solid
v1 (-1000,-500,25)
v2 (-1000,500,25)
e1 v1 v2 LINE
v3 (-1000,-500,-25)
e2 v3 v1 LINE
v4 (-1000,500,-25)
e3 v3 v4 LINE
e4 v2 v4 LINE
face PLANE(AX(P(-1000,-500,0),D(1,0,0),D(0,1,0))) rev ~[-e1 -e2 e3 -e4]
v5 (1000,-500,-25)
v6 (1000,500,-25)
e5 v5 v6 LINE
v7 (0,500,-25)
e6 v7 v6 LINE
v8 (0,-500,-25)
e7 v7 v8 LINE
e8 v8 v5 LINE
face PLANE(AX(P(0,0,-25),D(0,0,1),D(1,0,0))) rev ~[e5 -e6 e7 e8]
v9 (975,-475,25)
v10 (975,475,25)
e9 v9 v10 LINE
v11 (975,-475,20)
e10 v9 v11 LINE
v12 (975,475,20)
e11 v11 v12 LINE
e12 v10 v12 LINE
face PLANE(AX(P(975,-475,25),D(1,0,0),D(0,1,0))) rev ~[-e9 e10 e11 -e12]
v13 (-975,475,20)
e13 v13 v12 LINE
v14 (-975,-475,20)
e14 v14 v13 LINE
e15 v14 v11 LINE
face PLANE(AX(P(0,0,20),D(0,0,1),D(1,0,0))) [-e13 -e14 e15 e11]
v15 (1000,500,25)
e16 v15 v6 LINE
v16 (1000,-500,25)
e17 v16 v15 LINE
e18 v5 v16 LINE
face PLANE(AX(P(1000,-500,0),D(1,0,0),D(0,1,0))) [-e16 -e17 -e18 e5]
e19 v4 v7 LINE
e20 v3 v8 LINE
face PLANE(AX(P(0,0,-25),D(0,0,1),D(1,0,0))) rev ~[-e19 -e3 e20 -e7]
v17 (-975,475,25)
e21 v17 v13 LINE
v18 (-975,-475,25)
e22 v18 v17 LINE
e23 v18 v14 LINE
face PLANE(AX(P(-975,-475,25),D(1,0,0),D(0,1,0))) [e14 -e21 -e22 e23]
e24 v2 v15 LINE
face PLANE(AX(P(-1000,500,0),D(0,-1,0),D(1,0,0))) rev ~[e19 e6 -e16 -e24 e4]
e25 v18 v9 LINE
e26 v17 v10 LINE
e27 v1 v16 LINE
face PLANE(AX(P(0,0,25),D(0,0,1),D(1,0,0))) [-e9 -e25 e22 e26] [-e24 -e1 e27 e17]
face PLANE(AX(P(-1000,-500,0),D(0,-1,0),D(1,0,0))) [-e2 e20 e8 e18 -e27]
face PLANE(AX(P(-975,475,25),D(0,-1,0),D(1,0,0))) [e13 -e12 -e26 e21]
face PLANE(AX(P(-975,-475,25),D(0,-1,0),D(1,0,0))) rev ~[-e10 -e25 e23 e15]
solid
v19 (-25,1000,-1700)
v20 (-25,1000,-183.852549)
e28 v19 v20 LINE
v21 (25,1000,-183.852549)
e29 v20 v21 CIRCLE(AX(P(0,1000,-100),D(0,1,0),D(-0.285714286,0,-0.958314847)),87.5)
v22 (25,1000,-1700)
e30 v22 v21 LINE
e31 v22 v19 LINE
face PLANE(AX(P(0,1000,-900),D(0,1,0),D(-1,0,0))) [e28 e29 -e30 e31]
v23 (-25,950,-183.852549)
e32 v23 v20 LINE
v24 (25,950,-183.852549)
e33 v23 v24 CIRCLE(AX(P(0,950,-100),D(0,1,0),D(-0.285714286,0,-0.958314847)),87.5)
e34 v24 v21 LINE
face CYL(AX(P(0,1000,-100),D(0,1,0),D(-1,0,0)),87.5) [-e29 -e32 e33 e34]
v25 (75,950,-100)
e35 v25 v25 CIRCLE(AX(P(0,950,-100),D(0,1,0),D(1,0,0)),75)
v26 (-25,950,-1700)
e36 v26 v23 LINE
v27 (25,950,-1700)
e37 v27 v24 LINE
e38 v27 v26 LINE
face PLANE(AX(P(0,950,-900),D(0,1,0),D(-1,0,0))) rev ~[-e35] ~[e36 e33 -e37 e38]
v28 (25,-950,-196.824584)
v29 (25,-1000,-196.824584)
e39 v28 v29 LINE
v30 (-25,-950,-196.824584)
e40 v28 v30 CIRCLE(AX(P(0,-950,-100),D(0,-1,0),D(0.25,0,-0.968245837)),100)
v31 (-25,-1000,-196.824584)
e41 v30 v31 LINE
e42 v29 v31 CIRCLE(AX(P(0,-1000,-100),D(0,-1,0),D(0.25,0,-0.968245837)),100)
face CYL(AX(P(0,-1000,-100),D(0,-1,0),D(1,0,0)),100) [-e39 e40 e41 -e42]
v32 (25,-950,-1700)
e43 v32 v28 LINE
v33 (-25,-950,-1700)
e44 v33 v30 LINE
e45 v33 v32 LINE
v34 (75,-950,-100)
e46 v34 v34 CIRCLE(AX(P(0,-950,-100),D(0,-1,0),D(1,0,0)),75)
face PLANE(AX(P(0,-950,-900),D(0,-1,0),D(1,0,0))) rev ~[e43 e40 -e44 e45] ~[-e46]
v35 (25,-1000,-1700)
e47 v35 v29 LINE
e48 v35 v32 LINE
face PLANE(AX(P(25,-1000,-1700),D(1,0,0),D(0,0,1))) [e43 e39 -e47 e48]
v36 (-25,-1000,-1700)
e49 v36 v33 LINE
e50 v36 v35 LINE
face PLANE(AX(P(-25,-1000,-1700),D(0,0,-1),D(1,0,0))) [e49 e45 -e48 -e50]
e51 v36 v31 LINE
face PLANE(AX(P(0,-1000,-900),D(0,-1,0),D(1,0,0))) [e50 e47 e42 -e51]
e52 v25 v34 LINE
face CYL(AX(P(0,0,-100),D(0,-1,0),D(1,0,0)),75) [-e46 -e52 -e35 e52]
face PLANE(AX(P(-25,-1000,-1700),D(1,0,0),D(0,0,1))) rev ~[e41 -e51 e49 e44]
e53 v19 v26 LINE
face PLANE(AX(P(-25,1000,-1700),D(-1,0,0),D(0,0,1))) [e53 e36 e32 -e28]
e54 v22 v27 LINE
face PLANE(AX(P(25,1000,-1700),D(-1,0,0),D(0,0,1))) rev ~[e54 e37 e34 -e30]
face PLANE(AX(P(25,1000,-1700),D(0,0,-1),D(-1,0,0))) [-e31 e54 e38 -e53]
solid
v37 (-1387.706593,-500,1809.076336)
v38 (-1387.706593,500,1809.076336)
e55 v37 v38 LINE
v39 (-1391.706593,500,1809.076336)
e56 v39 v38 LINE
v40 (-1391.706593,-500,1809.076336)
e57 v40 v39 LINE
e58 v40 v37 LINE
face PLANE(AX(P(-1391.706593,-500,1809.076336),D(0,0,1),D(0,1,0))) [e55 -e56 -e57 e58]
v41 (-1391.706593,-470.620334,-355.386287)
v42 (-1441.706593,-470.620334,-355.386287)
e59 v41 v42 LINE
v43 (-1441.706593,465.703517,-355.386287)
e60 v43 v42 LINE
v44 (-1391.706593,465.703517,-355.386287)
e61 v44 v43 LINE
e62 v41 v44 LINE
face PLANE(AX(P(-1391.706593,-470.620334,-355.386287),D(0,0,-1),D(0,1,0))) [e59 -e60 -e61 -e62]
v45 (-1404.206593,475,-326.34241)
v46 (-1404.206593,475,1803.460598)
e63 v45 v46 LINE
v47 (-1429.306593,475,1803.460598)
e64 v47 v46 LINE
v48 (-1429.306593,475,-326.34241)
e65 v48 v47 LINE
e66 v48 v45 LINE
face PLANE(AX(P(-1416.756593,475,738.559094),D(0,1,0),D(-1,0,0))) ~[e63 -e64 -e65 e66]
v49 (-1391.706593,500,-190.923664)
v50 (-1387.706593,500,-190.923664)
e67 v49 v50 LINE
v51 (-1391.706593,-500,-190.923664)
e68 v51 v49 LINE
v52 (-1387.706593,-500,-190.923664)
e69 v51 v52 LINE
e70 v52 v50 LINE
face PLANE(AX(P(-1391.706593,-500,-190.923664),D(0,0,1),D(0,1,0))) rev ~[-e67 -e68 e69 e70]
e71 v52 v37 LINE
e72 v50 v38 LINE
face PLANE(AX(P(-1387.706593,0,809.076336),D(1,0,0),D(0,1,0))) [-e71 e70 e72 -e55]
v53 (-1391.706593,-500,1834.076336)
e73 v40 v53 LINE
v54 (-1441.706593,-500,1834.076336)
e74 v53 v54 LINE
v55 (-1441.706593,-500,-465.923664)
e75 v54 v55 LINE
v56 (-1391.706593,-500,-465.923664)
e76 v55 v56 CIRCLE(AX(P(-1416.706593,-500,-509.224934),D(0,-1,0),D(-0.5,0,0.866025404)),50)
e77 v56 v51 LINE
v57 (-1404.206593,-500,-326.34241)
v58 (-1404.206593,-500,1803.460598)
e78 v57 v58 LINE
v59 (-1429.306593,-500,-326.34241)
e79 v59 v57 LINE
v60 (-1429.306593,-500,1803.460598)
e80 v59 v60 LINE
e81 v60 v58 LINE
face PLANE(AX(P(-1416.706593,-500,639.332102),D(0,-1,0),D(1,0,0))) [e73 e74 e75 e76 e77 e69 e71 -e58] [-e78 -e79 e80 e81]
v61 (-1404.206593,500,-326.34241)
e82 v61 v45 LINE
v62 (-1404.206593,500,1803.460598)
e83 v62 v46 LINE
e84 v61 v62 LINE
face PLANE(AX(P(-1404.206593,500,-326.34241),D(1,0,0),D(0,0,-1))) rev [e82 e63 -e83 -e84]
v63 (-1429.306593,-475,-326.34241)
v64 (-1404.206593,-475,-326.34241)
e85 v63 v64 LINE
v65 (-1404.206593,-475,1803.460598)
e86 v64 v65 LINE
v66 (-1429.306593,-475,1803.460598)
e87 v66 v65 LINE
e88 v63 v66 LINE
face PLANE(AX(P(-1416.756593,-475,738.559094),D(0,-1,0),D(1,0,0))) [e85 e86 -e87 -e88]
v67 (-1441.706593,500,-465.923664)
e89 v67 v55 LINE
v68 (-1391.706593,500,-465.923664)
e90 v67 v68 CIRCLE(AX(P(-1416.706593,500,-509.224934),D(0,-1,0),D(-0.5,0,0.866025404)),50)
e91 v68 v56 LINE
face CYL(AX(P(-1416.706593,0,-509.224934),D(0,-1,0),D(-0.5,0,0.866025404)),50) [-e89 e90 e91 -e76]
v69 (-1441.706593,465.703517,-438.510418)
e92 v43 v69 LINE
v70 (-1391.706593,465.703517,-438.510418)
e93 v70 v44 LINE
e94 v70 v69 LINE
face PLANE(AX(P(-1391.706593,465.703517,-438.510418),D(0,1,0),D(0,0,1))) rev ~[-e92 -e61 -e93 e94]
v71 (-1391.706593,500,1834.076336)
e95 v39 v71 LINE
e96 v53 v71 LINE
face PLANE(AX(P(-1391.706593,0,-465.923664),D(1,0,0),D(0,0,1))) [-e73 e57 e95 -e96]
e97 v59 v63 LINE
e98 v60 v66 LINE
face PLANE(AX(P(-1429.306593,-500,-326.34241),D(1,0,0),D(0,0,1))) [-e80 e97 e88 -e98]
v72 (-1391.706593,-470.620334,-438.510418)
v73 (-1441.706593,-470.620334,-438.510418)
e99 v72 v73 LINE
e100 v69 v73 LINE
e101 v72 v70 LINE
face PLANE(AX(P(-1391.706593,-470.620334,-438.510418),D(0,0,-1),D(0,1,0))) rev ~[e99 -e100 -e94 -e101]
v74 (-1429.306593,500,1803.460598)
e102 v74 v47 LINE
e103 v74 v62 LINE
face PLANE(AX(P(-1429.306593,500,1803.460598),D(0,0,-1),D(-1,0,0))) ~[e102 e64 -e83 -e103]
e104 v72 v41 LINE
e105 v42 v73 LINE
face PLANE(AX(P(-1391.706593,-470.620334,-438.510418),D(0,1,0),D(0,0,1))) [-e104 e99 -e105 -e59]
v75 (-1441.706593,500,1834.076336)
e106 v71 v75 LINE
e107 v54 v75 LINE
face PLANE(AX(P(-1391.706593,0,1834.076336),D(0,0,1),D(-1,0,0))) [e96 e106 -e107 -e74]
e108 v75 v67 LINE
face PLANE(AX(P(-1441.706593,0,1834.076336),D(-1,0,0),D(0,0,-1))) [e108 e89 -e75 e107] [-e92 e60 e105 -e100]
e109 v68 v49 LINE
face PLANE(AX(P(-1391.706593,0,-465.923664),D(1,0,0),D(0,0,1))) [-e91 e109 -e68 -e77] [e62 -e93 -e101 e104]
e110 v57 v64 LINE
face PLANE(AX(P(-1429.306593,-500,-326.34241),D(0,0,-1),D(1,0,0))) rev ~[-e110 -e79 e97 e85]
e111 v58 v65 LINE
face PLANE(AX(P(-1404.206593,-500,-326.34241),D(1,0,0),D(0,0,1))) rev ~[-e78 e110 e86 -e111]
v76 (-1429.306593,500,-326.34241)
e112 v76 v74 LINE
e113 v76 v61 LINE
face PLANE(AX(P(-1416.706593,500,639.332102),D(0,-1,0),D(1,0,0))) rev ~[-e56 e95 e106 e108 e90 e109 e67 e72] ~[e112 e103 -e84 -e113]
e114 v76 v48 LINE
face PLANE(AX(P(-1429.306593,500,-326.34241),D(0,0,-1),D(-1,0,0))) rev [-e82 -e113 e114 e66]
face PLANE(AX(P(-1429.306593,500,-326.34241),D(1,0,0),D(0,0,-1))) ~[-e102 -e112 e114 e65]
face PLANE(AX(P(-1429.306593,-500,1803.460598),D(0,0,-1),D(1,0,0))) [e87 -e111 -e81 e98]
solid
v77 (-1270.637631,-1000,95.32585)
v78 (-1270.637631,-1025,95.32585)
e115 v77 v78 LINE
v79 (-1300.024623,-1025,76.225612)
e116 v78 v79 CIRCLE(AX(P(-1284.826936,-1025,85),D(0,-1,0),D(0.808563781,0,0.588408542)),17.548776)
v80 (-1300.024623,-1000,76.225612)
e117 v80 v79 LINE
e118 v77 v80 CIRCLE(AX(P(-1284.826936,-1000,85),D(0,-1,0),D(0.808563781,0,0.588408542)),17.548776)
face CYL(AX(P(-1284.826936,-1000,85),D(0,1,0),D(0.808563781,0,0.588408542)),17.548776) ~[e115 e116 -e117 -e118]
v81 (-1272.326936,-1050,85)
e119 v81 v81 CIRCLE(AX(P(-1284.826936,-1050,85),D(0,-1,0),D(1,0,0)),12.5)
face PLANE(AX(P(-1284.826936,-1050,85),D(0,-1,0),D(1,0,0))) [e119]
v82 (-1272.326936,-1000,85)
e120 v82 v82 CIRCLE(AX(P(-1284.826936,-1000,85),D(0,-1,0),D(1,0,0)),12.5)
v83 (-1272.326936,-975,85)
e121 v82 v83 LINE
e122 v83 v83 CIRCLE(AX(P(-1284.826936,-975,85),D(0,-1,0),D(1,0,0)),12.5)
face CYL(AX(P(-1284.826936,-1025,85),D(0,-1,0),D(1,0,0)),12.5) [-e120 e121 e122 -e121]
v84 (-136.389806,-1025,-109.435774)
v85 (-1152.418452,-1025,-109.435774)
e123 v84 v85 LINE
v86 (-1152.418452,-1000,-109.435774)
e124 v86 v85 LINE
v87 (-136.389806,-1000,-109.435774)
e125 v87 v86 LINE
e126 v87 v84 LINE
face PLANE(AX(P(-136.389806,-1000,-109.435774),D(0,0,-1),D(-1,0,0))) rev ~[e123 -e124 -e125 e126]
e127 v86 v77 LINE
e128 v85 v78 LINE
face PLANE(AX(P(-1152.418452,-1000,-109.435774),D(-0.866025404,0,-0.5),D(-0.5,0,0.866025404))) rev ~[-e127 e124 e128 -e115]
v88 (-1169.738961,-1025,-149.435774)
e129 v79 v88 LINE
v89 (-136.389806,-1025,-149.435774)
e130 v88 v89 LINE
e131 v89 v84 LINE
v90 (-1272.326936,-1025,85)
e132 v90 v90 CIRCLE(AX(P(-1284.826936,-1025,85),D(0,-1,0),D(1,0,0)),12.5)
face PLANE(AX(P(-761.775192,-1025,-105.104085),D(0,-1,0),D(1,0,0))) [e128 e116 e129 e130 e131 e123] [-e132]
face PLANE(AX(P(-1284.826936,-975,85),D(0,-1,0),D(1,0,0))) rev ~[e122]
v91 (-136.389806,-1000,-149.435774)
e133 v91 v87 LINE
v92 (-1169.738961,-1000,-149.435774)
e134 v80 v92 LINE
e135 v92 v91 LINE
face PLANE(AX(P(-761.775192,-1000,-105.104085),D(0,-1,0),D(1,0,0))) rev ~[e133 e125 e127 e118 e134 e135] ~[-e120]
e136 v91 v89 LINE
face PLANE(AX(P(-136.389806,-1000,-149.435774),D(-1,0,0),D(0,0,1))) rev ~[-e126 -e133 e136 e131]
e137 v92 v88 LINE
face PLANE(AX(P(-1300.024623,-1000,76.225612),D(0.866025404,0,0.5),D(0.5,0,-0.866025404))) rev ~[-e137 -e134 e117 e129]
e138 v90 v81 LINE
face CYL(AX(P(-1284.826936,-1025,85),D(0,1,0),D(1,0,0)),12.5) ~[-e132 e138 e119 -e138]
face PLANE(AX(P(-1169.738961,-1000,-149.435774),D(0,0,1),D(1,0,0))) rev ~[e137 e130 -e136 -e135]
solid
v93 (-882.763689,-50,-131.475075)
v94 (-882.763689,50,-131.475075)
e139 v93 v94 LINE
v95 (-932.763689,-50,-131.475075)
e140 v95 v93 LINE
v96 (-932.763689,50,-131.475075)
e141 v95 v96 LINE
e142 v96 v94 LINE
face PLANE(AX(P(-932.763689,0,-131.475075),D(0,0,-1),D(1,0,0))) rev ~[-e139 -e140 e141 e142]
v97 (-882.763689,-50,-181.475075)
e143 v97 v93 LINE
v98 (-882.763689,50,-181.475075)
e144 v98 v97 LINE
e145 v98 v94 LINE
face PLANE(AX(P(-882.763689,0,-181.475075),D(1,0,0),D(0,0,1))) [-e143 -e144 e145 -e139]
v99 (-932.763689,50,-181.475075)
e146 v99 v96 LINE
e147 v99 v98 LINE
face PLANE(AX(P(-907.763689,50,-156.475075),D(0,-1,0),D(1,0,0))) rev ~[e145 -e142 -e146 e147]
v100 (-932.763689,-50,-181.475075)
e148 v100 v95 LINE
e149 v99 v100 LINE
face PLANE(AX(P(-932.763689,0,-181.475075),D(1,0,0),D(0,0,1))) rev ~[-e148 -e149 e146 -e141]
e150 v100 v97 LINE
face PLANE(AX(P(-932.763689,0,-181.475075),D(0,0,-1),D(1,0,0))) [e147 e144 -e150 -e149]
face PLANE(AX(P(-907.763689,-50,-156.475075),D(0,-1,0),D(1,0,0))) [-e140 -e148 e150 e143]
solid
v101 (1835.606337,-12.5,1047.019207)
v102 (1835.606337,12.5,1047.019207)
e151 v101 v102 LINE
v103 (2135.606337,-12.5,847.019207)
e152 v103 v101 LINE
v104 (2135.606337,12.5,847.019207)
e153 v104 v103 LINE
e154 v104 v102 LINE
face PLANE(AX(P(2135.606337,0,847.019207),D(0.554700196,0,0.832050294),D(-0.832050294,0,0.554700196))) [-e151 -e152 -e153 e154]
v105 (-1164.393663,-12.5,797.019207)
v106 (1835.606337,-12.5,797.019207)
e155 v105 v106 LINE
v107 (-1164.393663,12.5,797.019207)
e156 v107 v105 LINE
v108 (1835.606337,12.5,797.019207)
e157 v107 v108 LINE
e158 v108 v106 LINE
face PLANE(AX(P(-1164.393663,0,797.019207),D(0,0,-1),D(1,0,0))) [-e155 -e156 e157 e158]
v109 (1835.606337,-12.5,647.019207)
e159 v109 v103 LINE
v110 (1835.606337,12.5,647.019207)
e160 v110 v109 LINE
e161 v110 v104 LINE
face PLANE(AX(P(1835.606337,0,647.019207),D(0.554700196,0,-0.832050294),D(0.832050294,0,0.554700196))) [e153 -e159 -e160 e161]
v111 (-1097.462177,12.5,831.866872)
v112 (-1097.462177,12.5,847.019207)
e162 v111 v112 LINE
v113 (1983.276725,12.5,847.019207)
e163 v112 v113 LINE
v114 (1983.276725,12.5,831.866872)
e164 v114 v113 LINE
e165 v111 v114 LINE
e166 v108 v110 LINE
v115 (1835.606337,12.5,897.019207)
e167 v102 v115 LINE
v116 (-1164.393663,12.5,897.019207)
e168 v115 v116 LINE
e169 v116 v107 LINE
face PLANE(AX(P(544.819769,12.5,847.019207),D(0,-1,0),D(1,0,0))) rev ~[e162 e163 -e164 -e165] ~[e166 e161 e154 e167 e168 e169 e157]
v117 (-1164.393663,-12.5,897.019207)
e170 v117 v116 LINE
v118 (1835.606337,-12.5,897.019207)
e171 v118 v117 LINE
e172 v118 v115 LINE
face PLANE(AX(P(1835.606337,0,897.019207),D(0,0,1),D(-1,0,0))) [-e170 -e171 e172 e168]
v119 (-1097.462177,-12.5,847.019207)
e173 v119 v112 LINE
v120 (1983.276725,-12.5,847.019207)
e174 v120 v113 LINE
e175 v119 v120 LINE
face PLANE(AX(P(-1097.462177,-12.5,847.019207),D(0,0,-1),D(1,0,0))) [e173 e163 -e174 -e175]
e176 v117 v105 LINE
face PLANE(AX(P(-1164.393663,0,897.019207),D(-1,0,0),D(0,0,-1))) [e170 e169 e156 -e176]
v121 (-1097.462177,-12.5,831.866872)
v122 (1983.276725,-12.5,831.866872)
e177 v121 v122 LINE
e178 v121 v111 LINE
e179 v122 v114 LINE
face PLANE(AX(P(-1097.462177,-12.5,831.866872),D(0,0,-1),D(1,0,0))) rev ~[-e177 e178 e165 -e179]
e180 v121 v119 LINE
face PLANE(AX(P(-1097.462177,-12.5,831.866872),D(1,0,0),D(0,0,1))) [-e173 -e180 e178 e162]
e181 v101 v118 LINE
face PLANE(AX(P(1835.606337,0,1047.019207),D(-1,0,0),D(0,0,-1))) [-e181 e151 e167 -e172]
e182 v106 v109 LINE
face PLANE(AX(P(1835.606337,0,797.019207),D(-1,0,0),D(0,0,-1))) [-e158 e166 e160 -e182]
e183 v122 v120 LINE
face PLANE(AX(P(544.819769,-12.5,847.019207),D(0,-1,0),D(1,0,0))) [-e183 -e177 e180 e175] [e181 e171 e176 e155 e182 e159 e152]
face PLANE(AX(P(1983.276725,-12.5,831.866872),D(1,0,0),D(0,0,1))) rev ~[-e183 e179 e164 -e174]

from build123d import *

# Parameters (mm, degrees)
F0_W           = 2000
F0_H           = 1000
F1_DEPTH       = 25
F2_W           = 1950
F2_H           = 950
F4_DEPTH       = 5
F5_R           = 75
F6_DEPTH       = 1000
F7_R           = 100
F7_R_2         = 75
F8_DEPTH       = 50
F9_W           = 50
F9_H           = 1600
F10_DEPTH      = 50
F11_R          = 87.5
F11_R_2        = 75
F12_DEPTH      = 50
F13_W          = 50
F13_H          = 1600
F14_DEPTH      = 50
F16_DEPTH      = 500
F17_W          = 25.1
F17_H          = 2129.8030083389
F18_DEPTH      = 25
F20_W          = 936.323851347
F20_H          = 83.1241309643
F21_DEPTH      = 75.001
F22_W          = 1000
F22_H          = 2000
F23_DEPTH      = 4
F24_R          = 12.5
F25_DEPTH      = 25
F26_R          = 12.5
F27_DEPTH      = 50
F27_DEPTH_BACK = 25
F29_DEPTH      = 12.5
F31_W          = 3080.738902092
F31_H          = 15.1523351669
F32_DEPTH      = 1012.501
F33_R          = 25
F34_DEPTH      = 50
F35_W          = 50
F35_H          = 50
F36_DEPTH      = 50


# Not quite as in the source:
# - a feature names something its author has since deleted; it is built from what else it names


with BuildPart() as f1:
    # F0 (on Top) → F1 (new body, symmetric)
    with BuildSketch(Plane.XY):
        Rectangle(F0_W, F0_H)
    extrude(amount=F1_DEPTH, both=True)

    # F2 (on face) → F4 (cut)
    with BuildSketch(Plane.XY.offset(25)):
        Rectangle(F2_W, F2_H)
    extrude(amount=-F4_DEPTH, mode=Mode.SUBTRACT)

    # F5 (on Front) → F6 (join, symmetric)
    with BuildSketch(Plane.XZ):
        with Locations((0, -100)):
            Circle(F5_R)
    extrude(amount=F6_DEPTH, both=True)

    # F7 (on face) → F8 (join)
    with BuildSketch(Plane.XZ.offset(1000)):
        with Locations((0, -100)):
            Circle(F7_R)
        with Locations((0, -100)):
            Circle(F7_R_2, mode=Mode.SUBTRACT)
    extrude(amount=-F8_DEPTH)

    # F9 (on face) → F10 (join)
    with BuildSketch(Plane.XZ.offset(1000)):
        with Locations((0, -900)):
            Rectangle(F9_W, F9_H)
    extrude(amount=-F10_DEPTH)

    # F11 (on face) → F12 (join)
    with BuildSketch(Plane(origin=(0, 1000, 0), x_dir=(-1, 0, 0), z_dir=(0, 1, 0))):
        with Locations((0, -100)):
            Circle(F11_R)
        with Locations((0, -100)):
            Circle(F11_R_2, mode=Mode.SUBTRACT)
    extrude(amount=-F12_DEPTH)

    # F13 (on face) → F14 (join)
    with BuildSketch(Plane(origin=(0, 1000, 0), x_dir=(-1, 0, 0), z_dir=(0, 1, 0))):
        with Locations((0, -900)):
            Rectangle(F13_W, F13_H)
    extrude(amount=-F14_DEPTH)


with BuildPart() as f16:
    # F15 (on Front) → F16 (new body, symmetric)
    with BuildSketch(Plane.XZ):
        with BuildLine():
            Line((-1441.7065932193, 1834.076336483), (-1441.7065932193, -465.923663517))
            ThreePointArc((-1441.7065932193, -465.923663517), (-1416.7065932193, -559.2249337063), (-1391.7065932193, -465.923663517))
            Line((-1391.7065932193, -465.923663517), (-1391.7065932193, 1834.076336483))
            Line((-1391.7065932193, 1834.076336483), (-1441.7065932193, 1834.076336483))
        make_face()
    extrude(amount=F16_DEPTH, both=True)

    # F17 (on face) → F18 (cut)
    with BuildSketch(Plane.XZ.offset(500)):
        with Locations((-1416.7565932193, 738.5590938225)):
            Rectangle(F17_W, F17_H)
    f18 = extrude(amount=-F18_DEPTH, mode=Mode.SUBTRACT)

    # F19: F18 across plane
    add(f18.mirror(Plane.XZ), mode=Mode.SUBTRACT)

    # F20 (on face) → F21 (cut, through all)
    with BuildSketch(Plane.YZ.offset(-1391.7065932193)):
        with Locations((-2.4584084749, -396.9483524561)):
            Rectangle(F20_W, F20_H)
    extrude(amount=-F21_DEPTH, mode=Mode.SUBTRACT)

    # F22 (on face) → F23 (join)
    with BuildSketch(Plane.YZ.offset(-1391.7065932193)):
        with Locations((0, 809.076336483)):
            Rectangle(F22_W, F22_H)
    extrude(amount=F23_DEPTH)


with BuildPart() as f25:
    # F24 (on face) → F25 (new body)
    with BuildSketch(Plane.XZ.offset(1000)):
        with BuildLine():
            Line((-136.3898057708, -149.4357743859), (-136.3898057708, -109.4357743859))
            Line((-136.3898057708, -109.4357743859), (-1152.4184524861, -109.4357743859))
            Line((-1152.4184524861, -109.4357743859), (-1270.6376314163, 95.3258499503))
            ThreePointArc((-1270.6376314163, 95.3258499503), (-1294.3903554093, 99.7139583837), (-1300.0246226155, 76.2256117888))
            Line((-1300.0246226155, 76.2256117888), (-1169.7389605618, -149.4357743859))
            Line((-1169.7389605618, -149.4357743859), (-136.3898057708, -149.4357743859))
        make_face()
        with Locations((-1284.8269364284, 85)):
            Circle(F24_R, mode=Mode.SUBTRACT)
    extrude(amount=F25_DEPTH)

    # F26 (on face) → F27 (join, two sides)
    with BuildSketch(Plane.XZ.offset(1025)) as f27_sk:
        with Locations((-1284.8269364284, 85)):
            Circle(F26_R)
    extrude(amount=-F27_DEPTH)
    extrude(f27_sk.sketch, amount=F27_DEPTH_BACK)


with BuildPart() as f29:
    # F28 (on Front) → F29 (new body, symmetric)
    with BuildSketch(Plane.XZ):
        Polygon((-1164.3936634064, 897.0192074776), (-1164.3936634064, 797.0192074776), (1835.6063365936, 797.0192074776), (1835.6063365936, 647.0192074776), (2135.6063365936, 847.0192074776), (1835.6063365936, 1047.0192074776), (1835.6063365936, 897.0192074776), align=None)
    extrude(amount=F29_DEPTH, both=True)

    # F31 (on face) → F32 (cut, through all)
    with BuildSketch(Plane.XZ.offset(12.5)):
        with Locations((442.9072737694, 839.4430398941)):
            Rectangle(F31_W, F31_H)
    extrude(amount=-F32_DEPTH, mode=Mode.SUBTRACT)


with BuildPart() as f34:
    # F33 (on Front) → F34 (new body, symmetric)
    with BuildSketch(Plane.XZ):
        with Locations((-900.4946947098, 269.2202627659)):
            Circle(F33_R)
    extrude(amount=F34_DEPTH, both=True)


with BuildPart() as f36:
    # F35 (on Front) → F36 (new body, symmetric)
    with BuildSketch(Plane.XZ):
        with Locations((-907.7636889409, -156.4750745893)):
            Rectangle(F35_W, F35_H)
    extrude(amount=F36_DEPTH, both=True)


solid = Compound([f1.part, f16.part, f25.part, f29.part, f36.part])
